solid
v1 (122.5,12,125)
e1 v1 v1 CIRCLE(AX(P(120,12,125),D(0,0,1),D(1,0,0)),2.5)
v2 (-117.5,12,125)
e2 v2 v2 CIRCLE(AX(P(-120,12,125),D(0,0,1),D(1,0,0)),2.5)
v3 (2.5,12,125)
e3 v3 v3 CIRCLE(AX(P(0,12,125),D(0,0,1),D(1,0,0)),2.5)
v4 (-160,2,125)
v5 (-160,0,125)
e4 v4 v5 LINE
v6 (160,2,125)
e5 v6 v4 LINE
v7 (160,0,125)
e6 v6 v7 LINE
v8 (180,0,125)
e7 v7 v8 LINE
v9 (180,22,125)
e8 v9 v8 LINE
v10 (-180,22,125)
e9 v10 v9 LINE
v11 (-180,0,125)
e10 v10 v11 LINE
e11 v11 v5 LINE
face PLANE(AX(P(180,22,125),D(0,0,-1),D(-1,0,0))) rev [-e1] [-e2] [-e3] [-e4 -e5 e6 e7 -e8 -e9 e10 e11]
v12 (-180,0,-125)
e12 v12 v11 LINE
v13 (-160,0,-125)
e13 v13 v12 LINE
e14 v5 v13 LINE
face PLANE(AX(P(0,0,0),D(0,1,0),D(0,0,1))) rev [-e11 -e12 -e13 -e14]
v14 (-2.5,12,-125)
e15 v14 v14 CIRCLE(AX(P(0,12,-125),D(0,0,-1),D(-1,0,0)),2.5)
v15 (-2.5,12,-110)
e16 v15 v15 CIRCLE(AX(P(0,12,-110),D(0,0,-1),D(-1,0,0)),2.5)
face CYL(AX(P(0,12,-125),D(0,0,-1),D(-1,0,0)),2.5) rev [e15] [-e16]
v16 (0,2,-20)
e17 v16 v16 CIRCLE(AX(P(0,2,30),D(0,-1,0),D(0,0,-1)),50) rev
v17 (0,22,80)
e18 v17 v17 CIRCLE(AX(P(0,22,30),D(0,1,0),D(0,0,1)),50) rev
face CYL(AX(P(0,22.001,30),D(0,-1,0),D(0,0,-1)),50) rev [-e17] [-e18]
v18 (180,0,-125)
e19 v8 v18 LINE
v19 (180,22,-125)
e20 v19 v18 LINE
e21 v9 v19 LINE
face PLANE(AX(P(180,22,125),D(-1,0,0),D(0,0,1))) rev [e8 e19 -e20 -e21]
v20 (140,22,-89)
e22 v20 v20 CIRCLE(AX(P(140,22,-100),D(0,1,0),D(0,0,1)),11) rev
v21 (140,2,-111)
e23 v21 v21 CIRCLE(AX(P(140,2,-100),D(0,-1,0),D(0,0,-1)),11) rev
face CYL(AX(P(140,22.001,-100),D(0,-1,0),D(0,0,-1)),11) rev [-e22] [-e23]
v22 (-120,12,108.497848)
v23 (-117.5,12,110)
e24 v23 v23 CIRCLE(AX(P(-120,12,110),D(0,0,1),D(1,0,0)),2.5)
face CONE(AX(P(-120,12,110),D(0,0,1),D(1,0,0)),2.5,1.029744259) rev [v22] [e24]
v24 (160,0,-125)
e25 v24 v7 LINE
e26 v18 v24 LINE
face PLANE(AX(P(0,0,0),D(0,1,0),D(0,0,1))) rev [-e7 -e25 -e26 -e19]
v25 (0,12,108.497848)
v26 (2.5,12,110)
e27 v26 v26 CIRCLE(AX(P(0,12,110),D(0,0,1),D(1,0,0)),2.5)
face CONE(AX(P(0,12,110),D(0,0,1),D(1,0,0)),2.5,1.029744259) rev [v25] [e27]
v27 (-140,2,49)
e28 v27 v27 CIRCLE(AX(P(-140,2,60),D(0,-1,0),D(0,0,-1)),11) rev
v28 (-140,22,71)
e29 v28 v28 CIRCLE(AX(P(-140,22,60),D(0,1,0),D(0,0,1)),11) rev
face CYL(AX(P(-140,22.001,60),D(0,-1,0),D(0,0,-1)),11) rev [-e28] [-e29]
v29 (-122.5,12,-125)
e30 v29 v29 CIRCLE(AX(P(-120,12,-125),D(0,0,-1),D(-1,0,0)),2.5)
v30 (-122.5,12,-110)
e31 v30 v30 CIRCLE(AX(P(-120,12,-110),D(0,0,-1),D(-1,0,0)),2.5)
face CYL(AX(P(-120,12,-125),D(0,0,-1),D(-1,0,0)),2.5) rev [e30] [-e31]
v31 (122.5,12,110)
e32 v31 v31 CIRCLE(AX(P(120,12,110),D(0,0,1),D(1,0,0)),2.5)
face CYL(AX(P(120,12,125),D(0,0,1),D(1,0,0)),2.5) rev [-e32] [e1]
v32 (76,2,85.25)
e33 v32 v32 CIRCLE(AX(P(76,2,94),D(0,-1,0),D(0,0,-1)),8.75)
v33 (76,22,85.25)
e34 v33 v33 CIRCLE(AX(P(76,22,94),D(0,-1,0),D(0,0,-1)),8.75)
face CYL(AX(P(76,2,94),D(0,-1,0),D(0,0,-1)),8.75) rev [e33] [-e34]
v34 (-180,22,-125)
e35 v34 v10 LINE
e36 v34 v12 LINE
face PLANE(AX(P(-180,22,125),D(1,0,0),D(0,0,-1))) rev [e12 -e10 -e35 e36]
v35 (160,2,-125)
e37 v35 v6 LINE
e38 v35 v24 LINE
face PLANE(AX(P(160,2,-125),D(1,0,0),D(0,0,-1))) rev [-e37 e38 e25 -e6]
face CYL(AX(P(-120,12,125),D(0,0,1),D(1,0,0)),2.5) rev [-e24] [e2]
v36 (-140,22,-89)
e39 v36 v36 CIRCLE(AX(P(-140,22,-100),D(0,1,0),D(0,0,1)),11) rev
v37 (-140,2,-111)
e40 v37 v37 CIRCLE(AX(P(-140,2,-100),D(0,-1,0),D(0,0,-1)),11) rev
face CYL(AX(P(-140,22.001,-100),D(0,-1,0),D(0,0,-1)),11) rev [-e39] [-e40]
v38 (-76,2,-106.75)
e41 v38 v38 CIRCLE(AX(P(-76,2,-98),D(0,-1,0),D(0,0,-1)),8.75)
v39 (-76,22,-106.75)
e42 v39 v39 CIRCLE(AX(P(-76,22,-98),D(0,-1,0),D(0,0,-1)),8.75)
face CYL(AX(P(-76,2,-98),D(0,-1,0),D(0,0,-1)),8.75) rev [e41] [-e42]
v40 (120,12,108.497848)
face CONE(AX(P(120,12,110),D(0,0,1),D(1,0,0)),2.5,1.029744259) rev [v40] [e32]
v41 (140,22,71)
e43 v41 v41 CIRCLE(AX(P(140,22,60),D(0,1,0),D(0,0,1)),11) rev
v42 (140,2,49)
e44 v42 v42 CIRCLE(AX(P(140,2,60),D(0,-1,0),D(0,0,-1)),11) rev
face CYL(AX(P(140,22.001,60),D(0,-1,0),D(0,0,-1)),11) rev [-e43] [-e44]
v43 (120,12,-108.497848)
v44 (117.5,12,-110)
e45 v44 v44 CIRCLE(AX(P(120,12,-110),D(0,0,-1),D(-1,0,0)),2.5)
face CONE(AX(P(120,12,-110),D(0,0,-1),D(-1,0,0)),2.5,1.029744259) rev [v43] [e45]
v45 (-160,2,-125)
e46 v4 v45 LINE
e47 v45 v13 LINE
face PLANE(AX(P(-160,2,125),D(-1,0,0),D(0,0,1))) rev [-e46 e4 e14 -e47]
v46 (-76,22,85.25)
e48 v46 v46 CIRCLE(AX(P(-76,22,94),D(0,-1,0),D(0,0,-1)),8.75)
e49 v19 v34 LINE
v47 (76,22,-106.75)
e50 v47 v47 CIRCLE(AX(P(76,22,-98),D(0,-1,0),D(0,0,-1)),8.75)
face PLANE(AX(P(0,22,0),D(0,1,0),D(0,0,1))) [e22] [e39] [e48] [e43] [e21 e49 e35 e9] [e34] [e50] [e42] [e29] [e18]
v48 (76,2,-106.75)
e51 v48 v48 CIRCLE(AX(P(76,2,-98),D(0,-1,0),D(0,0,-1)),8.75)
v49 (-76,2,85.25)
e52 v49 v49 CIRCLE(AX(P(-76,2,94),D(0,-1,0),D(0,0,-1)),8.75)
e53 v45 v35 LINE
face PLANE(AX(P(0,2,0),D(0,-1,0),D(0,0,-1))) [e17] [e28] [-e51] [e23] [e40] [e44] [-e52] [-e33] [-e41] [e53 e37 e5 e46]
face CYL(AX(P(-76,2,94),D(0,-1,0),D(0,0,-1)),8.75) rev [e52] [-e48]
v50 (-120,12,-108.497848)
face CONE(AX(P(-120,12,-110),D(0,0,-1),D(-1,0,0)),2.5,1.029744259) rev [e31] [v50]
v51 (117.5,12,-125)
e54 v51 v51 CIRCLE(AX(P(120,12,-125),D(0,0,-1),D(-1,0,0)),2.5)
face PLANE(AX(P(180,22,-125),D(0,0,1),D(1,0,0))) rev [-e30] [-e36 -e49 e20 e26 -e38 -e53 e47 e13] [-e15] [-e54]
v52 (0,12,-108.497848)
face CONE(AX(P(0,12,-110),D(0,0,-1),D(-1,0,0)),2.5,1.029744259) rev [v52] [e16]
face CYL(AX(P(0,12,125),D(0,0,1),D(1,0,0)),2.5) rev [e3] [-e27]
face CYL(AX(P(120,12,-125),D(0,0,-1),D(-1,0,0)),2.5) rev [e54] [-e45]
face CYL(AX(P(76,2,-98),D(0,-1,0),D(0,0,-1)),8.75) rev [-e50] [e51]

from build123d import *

# Parameters (mm, degrees)
SKETCH_1_W                  = 360
SKETCH_1_H                  = 250
EXTRUDE_1_DEPTH             = 22
CUT_EXTRUDE_1_REACH         = 222.248
SKETCH_2_R                  = 50
SKETCH_2_R_2                = 11
SKETCH_3_W                  = 320
SKETCH_3_H                  = 250
CUT_EXTRUDE_2_DEPTH         = 2
PATTERN_START               = 2
PATTERN_LINEAR_1_OUTLINE_R  = 11
PATTERN_LINEAR_1_DEPTH      = 20
HOLE_WIZARD_M20_1_D         = 17.5
PATTERN_LINEAR_2_COUNT      = 2
PATTERN_LINEAR_2_PITCH      = 192
PATTERN_LINEAR_2_COUNT_DIR2 = 2
PATTERN_LINEAR_2_PITCH_DIR2 = 152
HOLE_WIZARD_M6_1_AT_2_COUNT = 2
HOLE_WIZARD_M6_1_AT_2_PITCH = 120
HOLE_WIZARD_M6_1_AT_3_COUNT = 2
HOLE_WIZARD_M6_1_AT_3_PITCH = 240


# Read off the part's stored shape, not the designer's step: 阵列(线性)1
with BuildPart() as part:
    # 草图1 → 凸台-拉伸1 (new body)
    with BuildSketch(Plane(origin=(0, 0, 0), x_dir=(1, 0, 0), z_dir=(0, 1, 0))):
        Rectangle(SKETCH_1_W, SKETCH_1_H)
    extrude(amount=EXTRUDE_1_DEPTH)

    # 草图2 → 切除-拉伸1 (cut, up to next)
    with BuildSketch(Plane.XZ, mode=Mode.PRIVATE) as cut_extrude_1_sk1:
        with Locations(Location((0, 30, 0), (0, 0, 270))):
            Circle(SKETCH_2_R)
    cut_extrude_1_tool1 = extrude(cut_extrude_1_sk1.sketch, amount=-CUT_EXTRUDE_1_REACH, mode=Mode.PRIVATE) & part.part
    # 草图2 → 切除-拉伸1 (cut, up to next)
    with BuildSketch(Plane.XZ, mode=Mode.PRIVATE) as cut_extrude_1_sk2:
        with Locations(Location((-140, 60, 0), (0, 0, 270))):
            Circle(SKETCH_2_R_2)
    cut_extrude_1_tool2 = extrude(cut_extrude_1_sk2.sketch, amount=-CUT_EXTRUDE_1_REACH, mode=Mode.PRIVATE) & part.part
    add(cut_extrude_1_tool1.solids().sort_by_distance((0, 0, 30))[0], mode=Mode.SUBTRACT)
    add(cut_extrude_1_tool2.solids().sort_by_distance((-140, 0, 60))[0], mode=Mode.SUBTRACT)

    # 草图3 → 切除-拉伸2 (cut)
    with BuildSketch(Plane.XZ):
        Rectangle(SKETCH_3_W, SKETCH_3_H)
    extrude(amount=-CUT_EXTRUDE_2_DEPTH, mode=Mode.SUBTRACT)

    # 阵列(线性)1 outline → 阵列(线性)1 (cut)
    with BuildSketch(Plane(origin=(0, 0, 0), x_dir=(1, 0, 0), z_dir=(0, 1, 0)).offset(PATTERN_START)):
        with Locations((140, 100)):
            Circle(PATTERN_LINEAR_1_OUTLINE_R)
        with Locations((-140, 100)):
            Circle(PATTERN_LINEAR_1_OUTLINE_R)
        with Locations((140, -60)):
            Circle(PATTERN_LINEAR_1_OUTLINE_R)
    extrude(amount=PATTERN_LINEAR_1_DEPTH, mode=Mode.SUBTRACT)

    # M20 螺纹孔1 (through all)
    with Locations(Plane(origin=(0, 2, 0), x_dir=(-1, 0, 0), z_dir=(0, -1, 0))):
        with Locations((76, -94)):
            hole_wizard_m20_1 = Hole(HOLE_WIZARD_M20_1_D / 2)

    # 阵列(线性)2: Hole Wizard M20 _1 2 × 2
    with Locations(*[(j * PATTERN_LINEAR_2_PITCH_DIR2, 0, -i * PATTERN_LINEAR_2_PITCH) for i in range(PATTERN_LINEAR_2_COUNT) for j in range(PATTERN_LINEAR_2_COUNT_DIR2) if (i, j) != (0, 0)]):
        add(hole_wizard_m20_1, mode=Mode.SUBTRACT)

    # 草图7 → M6 螺纹孔1 (revolve, cut)
    with BuildSketch(Plane(origin=(120, 12, -125), x_dir=(0, 1, 0), z_dir=(1, 0, 0))):
        Polygon((0, 0), (0, 16.502151548), (2.5, 15), (2.5, 0), align=None)
    hole_wizard_m6_1 = revolve(axis=Axis((120, 12, -131.35), (0, 0, 1)), mode=Mode.SUBTRACT)

    # M6 螺纹孔1 at 2: M6 螺纹孔1 ×2
    with Locations(*[(-i * HOLE_WIZARD_M6_1_AT_2_PITCH, 0, 0) for i in range(1, HOLE_WIZARD_M6_1_AT_2_COUNT)]):
        add(hole_wizard_m6_1, mode=Mode.SUBTRACT)

    # M6 螺纹孔1 at 3: M6 螺纹孔1 ×2
    with Locations(*[(-i * HOLE_WIZARD_M6_1_AT_3_PITCH, 0, 0) for i in range(1, HOLE_WIZARD_M6_1_AT_3_COUNT)]):
        add(hole_wizard_m6_1, mode=Mode.SUBTRACT)

    # 镜向1: M6 螺纹孔1 across plane
    add(hole_wizard_m6_1.mirror(Plane.XY), mode=Mode.SUBTRACT)

    # 镜向1 copy 1 sketch → 镜向1 copy 1 (revolve, cut)
    with BuildSketch(Plane(origin=(0, 12, 125), x_dir=(0, 1, 0), z_dir=(1, 0, 0))):
        Polygon((0, 0), (0, -16.502151548), (2.5, -15), (2.5, 0), align=None)
    revolve(axis=Axis((0, 12, 131.35), (0, 0, 1)), mode=Mode.SUBTRACT)

    # 镜向1 copy 2 sketch → 镜向1 copy 2 (revolve, cut)
    with BuildSketch(Plane(origin=(-120, 12, 125), x_dir=(0, 1, 0), z_dir=(1, 0, 0))):
        Polygon((0, 0), (0, -16.502151548), (2.5, -15), (2.5, 0), align=None)
    revolve(axis=Axis((-120, 12, 131.35), (0, 0, 1)), mode=Mode.SUBTRACT)


solid = part.part
